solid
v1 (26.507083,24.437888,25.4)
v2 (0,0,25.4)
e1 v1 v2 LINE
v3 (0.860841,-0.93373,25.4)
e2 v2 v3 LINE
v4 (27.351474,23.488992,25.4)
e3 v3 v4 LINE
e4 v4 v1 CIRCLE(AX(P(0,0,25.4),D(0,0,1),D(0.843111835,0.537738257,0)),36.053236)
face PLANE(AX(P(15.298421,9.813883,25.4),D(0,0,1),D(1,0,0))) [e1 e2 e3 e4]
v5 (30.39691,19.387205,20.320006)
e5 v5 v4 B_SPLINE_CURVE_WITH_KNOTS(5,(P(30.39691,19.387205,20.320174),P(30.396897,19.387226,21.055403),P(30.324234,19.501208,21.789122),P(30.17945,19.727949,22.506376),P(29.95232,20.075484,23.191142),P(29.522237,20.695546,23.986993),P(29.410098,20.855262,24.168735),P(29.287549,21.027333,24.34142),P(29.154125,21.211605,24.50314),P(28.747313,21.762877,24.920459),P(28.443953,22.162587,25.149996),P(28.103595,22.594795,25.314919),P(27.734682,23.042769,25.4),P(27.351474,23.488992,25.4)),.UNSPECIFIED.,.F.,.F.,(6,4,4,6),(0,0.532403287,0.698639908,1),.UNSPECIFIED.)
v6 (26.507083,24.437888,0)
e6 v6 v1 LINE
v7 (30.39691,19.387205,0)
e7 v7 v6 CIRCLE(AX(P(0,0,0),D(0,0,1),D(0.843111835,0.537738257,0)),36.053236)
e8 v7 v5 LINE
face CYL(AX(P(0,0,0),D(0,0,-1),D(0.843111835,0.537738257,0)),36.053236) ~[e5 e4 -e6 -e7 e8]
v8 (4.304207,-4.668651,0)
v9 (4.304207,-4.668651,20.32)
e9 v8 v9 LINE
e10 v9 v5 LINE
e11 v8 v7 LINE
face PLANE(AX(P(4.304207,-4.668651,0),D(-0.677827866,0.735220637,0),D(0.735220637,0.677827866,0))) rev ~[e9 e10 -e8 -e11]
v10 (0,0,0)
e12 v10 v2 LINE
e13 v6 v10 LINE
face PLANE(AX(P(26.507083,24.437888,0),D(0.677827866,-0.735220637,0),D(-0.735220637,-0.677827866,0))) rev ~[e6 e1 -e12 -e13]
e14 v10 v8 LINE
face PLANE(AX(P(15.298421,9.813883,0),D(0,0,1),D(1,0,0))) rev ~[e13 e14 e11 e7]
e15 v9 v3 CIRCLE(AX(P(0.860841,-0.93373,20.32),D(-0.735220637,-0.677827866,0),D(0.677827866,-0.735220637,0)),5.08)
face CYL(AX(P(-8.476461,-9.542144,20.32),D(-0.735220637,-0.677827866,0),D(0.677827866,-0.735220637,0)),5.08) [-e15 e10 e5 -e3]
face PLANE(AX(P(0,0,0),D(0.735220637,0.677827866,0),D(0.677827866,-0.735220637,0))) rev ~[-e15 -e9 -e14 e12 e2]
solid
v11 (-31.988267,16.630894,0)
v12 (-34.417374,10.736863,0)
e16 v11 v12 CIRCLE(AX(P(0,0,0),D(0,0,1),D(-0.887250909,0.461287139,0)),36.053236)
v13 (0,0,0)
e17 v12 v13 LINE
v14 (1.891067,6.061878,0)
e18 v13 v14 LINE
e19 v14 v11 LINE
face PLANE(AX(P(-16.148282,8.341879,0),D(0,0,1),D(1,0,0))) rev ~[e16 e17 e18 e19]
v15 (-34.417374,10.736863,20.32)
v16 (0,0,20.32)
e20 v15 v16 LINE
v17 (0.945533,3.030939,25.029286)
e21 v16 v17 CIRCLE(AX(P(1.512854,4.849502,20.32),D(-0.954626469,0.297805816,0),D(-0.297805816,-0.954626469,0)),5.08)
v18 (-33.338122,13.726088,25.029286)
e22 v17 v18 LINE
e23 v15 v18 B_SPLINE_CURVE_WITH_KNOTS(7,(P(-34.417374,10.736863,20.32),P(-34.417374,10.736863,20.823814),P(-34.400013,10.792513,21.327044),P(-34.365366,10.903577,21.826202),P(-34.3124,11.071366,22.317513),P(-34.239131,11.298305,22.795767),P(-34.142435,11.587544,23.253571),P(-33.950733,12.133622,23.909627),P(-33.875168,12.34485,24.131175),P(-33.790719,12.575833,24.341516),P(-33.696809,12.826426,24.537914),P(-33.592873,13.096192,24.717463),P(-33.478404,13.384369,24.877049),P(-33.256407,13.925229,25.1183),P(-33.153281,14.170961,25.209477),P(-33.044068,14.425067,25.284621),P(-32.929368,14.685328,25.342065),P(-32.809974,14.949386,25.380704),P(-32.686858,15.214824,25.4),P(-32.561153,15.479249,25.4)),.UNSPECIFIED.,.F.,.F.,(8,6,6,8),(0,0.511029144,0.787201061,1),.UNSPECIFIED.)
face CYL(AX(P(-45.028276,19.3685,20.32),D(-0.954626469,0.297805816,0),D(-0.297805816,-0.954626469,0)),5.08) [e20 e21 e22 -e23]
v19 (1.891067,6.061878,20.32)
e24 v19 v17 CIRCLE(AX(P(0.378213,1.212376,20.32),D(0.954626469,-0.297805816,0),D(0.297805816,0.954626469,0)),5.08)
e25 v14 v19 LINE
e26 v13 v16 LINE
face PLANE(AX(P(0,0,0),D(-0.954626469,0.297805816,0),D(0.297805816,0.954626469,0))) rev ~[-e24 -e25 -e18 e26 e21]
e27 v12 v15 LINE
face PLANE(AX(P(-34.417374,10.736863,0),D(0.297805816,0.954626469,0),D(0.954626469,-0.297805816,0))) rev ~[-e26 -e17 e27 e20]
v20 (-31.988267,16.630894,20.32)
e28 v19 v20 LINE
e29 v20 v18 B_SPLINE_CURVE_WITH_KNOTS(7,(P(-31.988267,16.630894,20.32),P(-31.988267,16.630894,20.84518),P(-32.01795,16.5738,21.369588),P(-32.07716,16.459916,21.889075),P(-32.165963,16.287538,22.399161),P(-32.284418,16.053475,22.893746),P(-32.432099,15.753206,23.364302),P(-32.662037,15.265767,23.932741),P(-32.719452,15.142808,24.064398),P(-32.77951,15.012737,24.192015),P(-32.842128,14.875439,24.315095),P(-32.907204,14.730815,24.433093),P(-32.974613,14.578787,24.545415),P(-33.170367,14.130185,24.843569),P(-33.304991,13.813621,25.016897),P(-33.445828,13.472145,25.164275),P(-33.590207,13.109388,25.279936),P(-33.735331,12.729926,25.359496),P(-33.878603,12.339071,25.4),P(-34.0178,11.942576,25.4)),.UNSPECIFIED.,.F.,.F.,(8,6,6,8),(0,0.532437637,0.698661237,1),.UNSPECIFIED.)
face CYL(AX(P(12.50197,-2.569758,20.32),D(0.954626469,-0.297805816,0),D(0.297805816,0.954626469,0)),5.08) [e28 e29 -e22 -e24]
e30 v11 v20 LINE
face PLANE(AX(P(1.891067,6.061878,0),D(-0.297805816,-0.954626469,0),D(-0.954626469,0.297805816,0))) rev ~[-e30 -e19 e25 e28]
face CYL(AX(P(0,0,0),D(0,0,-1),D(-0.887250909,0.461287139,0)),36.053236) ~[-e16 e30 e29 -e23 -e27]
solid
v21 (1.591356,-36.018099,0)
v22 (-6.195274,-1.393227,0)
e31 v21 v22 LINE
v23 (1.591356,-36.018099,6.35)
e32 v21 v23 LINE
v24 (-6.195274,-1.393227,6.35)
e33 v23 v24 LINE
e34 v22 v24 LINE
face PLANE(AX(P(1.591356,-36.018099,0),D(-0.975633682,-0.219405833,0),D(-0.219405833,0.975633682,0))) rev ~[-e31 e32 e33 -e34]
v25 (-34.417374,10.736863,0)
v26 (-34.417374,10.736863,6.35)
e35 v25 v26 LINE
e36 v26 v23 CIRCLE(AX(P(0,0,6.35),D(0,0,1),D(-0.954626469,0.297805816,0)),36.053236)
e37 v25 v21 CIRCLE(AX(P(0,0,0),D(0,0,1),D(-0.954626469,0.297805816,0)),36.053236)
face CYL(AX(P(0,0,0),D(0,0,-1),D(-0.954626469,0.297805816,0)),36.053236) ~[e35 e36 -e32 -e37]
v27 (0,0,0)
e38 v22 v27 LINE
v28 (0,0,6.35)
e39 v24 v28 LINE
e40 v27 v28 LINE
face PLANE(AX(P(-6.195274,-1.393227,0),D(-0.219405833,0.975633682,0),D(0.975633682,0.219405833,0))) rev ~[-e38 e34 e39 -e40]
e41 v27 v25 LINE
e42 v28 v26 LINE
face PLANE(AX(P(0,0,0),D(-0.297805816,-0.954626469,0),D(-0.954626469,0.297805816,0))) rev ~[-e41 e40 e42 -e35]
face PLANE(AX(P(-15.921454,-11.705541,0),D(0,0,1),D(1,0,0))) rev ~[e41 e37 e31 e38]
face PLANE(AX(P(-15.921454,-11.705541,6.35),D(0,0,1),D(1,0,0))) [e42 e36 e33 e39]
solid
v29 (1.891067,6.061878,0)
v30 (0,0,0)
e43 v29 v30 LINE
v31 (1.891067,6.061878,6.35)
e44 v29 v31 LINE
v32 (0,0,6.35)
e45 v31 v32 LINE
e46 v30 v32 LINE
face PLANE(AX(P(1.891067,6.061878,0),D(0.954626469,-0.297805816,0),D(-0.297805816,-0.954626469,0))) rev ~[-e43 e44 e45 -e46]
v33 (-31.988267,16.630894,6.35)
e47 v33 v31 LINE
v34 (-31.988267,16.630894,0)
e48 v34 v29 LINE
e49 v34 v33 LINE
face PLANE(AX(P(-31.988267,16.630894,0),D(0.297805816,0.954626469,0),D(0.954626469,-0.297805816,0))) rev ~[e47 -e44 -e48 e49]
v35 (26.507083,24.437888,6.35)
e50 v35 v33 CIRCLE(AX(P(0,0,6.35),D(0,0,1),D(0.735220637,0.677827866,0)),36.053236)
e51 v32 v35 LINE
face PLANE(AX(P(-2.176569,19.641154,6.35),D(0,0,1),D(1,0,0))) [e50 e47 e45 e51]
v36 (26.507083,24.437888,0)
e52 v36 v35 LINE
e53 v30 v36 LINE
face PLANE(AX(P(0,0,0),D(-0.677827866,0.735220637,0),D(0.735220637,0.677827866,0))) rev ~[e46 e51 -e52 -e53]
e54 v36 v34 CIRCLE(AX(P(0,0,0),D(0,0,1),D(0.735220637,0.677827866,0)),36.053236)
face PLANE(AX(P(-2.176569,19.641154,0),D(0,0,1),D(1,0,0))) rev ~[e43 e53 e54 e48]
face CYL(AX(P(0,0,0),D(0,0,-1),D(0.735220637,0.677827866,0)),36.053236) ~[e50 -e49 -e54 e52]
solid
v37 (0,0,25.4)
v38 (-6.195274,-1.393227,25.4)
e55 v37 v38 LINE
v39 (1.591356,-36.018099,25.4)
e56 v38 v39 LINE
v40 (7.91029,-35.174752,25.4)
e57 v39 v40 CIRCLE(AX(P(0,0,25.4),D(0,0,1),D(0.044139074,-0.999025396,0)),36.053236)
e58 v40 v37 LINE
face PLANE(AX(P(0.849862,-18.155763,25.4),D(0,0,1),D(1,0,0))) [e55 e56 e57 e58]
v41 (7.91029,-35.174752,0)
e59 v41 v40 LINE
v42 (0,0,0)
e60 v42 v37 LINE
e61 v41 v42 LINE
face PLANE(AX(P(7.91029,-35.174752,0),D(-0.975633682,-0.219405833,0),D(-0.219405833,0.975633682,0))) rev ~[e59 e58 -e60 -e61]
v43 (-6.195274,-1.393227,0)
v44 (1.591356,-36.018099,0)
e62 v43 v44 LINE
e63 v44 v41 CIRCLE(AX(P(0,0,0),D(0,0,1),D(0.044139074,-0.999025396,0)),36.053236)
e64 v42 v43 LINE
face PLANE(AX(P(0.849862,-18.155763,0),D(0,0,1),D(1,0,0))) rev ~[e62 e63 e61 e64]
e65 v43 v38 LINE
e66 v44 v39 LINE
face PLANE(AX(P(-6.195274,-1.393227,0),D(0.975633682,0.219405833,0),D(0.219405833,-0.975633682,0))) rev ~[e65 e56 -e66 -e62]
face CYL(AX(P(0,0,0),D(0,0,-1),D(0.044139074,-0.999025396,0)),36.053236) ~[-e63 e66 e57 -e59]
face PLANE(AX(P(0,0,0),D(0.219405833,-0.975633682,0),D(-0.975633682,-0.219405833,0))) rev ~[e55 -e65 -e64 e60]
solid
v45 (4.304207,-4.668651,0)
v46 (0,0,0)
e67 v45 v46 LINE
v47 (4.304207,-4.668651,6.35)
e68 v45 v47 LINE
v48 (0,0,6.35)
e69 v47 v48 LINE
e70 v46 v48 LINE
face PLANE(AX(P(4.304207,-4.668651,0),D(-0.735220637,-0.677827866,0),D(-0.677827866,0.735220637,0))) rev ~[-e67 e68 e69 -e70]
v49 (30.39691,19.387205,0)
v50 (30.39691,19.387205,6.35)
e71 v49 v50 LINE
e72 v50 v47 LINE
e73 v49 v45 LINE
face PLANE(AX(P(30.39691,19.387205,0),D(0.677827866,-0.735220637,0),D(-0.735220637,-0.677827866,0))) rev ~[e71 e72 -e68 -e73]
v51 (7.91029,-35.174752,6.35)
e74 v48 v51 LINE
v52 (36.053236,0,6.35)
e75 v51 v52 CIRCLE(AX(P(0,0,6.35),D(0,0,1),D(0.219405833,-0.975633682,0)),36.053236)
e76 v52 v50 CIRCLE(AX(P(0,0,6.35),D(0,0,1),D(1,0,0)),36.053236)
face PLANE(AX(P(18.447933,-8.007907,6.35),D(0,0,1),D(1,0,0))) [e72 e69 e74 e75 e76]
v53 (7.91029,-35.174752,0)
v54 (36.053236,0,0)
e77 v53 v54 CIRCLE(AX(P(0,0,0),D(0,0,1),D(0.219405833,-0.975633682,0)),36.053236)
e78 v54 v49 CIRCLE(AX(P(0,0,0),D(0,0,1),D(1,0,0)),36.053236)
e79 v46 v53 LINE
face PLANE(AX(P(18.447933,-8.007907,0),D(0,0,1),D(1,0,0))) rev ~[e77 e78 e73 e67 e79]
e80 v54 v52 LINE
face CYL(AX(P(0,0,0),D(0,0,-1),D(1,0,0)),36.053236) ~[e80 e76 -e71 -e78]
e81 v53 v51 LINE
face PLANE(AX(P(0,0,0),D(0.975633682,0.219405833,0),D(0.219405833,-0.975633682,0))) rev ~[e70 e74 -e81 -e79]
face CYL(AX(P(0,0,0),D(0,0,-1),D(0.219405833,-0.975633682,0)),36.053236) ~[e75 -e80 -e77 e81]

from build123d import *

# Parameters (mm, degrees)
F1_DEPTH      = 25.4
F2_DEPTH      = 6.35
F3_T1_DEPTH   = 61.4532364119
F3_T3_DEPTH   = 60.8896232126
F3_2_T1_DEPTH = 60.8896232126


# Not quite as in the source:
# - a fillet or chamfer that OpenCascade refuses, or shapes differently, is made with other operations: its cross-section is extruded or revolved along the edge and cut away or added


with BuildPart() as f1:
    # F0 (on Top) → F1 (new body)
    with BuildSketch(Plane.XY):
        with BuildLine():
            Line((-34.4173737851, 10.7368634857), (0, 0))
            Line((0, 0), (1.891066931, 6.0618780805))
            Line((1.891066931, 6.0618780805), (-31.9882667756, 16.6308942775))
            ThreePointArc((-31.9882667756, 16.6308942775), (-33.3333492813, 13.737673801), (-34.4173737851, 10.7368634857))
        make_face()
    extrude(amount=F1_DEPTH)

    # F3: fillet of radius 5.08 on 2 edges, made by hand

    # F3_s2 → F3_t1 (cut)
    with BuildSketch(Plane(origin=(-46.541129946, 14.5189973478, 0), x_dir=(0, 0, 1), z_dir=(0.9546264694, -0.2978058159, 0))):
        with BuildLine():
            ThreePointArc((20.32, 0), (23.9121024484, -1.4878975516), (25.4, -5.08))
            Line((25.4, -5.08), (25.4, 0))
            Line((25.4, 0), (20.32, 0))
        make_face()
    extrude(amount=F3_T1_DEPTH, mode=Mode.SUBTRACT)

    # F3_s4 → F3_t3 (cut)
    with BuildSketch(Plane(origin=(12.1237561609, -3.782133862, 0), x_dir=(0, 0, 1), z_dir=(-0.9546264694, 0.2978058159, 0))):
        with BuildLine():
            ThreePointArc((20.32, 6.35), (23.9121024484, 4.8621024484), (25.4, 1.27))
            Line((25.4, 1.27), (25.4, 6.35))
            Line((25.4, 6.35), (20.32, 6.35))
        make_face()
    extrude(amount=F3_T3_DEPTH, mode=Mode.SUBTRACT)


with BuildPart() as f1b:
    # F0 (on Top) → F1, piece 2 (new body)
    with BuildSketch(Plane.XY):
        with BuildLine():
            ThreePointArc((1.5913564558, -36.0180987894), (4.7695001401, -35.7363641714), (7.9102903569, -35.1747517723))
            Line((7.9102903569, -35.1747517723), (0, 0))
            Line((0, 0), (-6.1952738778, -1.3932270377))
            Line((-6.1952738778, -1.3932270377), (1.5913564558, -36.0180987894))
        make_face()
    extrude(amount=F1_DEPTH)


with BuildPart() as f1c:
    # F0 (on Top) → F1, piece 3 (new body)
    with BuildSketch(Plane.XY):
        with BuildLine():
            Line((4.3042069468, -4.6686510427), (30.3969103198, 19.3872045119))
            ThreePointArc((30.3969103198, 19.3872045119), (28.5638491413, 21.9986903703), (26.5070834282, 24.4378882866))
            Line((26.5070834282, 24.4378882866), (0, 0))
            Line((0, 0), (4.3042069468, -4.6686510427))
        make_face()
    extrude(amount=F1_DEPTH)

    # F3#2: fillet of radius 5.08 on 1 edges, made by hand

    # F3_2_s2 → F3_2_t1 (cut)
    with BuildSketch(Plane(origin=(-9.3373020855, -8.6084138936, 0), x_dir=(0, 0, 1), z_dir=(0.7352206367, 0.6778278656, 0))):
        with BuildLine():
            ThreePointArc((20.32, 6.35), (23.9121024484, 4.8621024484), (25.4, 1.27))
            Line((25.4, 1.27), (25.4, 6.35))
            Line((25.4, 6.35), (20.32, 6.35))
        make_face()
    extrude(amount=F3_2_T1_DEPTH, mode=Mode.SUBTRACT)


with BuildPart() as f2:
    # F0 (on Top) → F2 (new body)
    with BuildSketch(Plane.XY):
        with BuildLine():
            ThreePointArc((-34.4173737851, 10.7368634857), (-28.5638491413, -21.9986903703), (1.5913564558, -36.0180987894))
            Line((1.5913564558, -36.0180987894), (-6.1952738778, -1.3932270377))
            Line((-6.1952738778, -1.3932270377), (0, 0))
            Line((0, 0), (-34.4173737851, 10.7368634857))
        make_face()
    extrude(amount=F2_DEPTH)


with BuildPart() as f2b:
    # F0 (on Top) → F2, piece 2 (new body)
    with BuildSketch(Plane.XY):
        with BuildLine():
            ThreePointArc((7.9102903569, -35.1747517723), (28.1516200608, -22.523812815), (36.0532364119, 0))
            ThreePointArc((36.0532364119, 0), (34.6102791792, 10.0977438526), (30.3969103198, 19.3872045119))
            Line((30.3969103198, 19.3872045119), (4.3042069468, -4.6686510427))
            Line((4.3042069468, -4.6686510427), (0, 0))
            Line((0, 0), (7.9102903569, -35.1747517723))
        make_face()
    extrude(amount=F2_DEPTH)


with BuildPart() as f2c:
    # F0 (on Top) → F2, piece 3 (new body)
    with BuildSketch(Plane.XY):
        with BuildLine():
            Line((0, 0), (26.5070834282, 24.4378882866))
            ThreePointArc((26.5070834282, 24.4378882866), (-4.7695001401, 35.7363641714), (-31.9882667756, 16.6308942775))
            Line((-31.9882667756, 16.6308942775), (1.891066931, 6.0618780805))
            Line((1.891066931, 6.0618780805), (0, 0))
        make_face()
    extrude(amount=F2_DEPTH)


solid = Compound([f1.part, f1b.part, f1c.part, f2.part, f2b.part, f2c.part])
